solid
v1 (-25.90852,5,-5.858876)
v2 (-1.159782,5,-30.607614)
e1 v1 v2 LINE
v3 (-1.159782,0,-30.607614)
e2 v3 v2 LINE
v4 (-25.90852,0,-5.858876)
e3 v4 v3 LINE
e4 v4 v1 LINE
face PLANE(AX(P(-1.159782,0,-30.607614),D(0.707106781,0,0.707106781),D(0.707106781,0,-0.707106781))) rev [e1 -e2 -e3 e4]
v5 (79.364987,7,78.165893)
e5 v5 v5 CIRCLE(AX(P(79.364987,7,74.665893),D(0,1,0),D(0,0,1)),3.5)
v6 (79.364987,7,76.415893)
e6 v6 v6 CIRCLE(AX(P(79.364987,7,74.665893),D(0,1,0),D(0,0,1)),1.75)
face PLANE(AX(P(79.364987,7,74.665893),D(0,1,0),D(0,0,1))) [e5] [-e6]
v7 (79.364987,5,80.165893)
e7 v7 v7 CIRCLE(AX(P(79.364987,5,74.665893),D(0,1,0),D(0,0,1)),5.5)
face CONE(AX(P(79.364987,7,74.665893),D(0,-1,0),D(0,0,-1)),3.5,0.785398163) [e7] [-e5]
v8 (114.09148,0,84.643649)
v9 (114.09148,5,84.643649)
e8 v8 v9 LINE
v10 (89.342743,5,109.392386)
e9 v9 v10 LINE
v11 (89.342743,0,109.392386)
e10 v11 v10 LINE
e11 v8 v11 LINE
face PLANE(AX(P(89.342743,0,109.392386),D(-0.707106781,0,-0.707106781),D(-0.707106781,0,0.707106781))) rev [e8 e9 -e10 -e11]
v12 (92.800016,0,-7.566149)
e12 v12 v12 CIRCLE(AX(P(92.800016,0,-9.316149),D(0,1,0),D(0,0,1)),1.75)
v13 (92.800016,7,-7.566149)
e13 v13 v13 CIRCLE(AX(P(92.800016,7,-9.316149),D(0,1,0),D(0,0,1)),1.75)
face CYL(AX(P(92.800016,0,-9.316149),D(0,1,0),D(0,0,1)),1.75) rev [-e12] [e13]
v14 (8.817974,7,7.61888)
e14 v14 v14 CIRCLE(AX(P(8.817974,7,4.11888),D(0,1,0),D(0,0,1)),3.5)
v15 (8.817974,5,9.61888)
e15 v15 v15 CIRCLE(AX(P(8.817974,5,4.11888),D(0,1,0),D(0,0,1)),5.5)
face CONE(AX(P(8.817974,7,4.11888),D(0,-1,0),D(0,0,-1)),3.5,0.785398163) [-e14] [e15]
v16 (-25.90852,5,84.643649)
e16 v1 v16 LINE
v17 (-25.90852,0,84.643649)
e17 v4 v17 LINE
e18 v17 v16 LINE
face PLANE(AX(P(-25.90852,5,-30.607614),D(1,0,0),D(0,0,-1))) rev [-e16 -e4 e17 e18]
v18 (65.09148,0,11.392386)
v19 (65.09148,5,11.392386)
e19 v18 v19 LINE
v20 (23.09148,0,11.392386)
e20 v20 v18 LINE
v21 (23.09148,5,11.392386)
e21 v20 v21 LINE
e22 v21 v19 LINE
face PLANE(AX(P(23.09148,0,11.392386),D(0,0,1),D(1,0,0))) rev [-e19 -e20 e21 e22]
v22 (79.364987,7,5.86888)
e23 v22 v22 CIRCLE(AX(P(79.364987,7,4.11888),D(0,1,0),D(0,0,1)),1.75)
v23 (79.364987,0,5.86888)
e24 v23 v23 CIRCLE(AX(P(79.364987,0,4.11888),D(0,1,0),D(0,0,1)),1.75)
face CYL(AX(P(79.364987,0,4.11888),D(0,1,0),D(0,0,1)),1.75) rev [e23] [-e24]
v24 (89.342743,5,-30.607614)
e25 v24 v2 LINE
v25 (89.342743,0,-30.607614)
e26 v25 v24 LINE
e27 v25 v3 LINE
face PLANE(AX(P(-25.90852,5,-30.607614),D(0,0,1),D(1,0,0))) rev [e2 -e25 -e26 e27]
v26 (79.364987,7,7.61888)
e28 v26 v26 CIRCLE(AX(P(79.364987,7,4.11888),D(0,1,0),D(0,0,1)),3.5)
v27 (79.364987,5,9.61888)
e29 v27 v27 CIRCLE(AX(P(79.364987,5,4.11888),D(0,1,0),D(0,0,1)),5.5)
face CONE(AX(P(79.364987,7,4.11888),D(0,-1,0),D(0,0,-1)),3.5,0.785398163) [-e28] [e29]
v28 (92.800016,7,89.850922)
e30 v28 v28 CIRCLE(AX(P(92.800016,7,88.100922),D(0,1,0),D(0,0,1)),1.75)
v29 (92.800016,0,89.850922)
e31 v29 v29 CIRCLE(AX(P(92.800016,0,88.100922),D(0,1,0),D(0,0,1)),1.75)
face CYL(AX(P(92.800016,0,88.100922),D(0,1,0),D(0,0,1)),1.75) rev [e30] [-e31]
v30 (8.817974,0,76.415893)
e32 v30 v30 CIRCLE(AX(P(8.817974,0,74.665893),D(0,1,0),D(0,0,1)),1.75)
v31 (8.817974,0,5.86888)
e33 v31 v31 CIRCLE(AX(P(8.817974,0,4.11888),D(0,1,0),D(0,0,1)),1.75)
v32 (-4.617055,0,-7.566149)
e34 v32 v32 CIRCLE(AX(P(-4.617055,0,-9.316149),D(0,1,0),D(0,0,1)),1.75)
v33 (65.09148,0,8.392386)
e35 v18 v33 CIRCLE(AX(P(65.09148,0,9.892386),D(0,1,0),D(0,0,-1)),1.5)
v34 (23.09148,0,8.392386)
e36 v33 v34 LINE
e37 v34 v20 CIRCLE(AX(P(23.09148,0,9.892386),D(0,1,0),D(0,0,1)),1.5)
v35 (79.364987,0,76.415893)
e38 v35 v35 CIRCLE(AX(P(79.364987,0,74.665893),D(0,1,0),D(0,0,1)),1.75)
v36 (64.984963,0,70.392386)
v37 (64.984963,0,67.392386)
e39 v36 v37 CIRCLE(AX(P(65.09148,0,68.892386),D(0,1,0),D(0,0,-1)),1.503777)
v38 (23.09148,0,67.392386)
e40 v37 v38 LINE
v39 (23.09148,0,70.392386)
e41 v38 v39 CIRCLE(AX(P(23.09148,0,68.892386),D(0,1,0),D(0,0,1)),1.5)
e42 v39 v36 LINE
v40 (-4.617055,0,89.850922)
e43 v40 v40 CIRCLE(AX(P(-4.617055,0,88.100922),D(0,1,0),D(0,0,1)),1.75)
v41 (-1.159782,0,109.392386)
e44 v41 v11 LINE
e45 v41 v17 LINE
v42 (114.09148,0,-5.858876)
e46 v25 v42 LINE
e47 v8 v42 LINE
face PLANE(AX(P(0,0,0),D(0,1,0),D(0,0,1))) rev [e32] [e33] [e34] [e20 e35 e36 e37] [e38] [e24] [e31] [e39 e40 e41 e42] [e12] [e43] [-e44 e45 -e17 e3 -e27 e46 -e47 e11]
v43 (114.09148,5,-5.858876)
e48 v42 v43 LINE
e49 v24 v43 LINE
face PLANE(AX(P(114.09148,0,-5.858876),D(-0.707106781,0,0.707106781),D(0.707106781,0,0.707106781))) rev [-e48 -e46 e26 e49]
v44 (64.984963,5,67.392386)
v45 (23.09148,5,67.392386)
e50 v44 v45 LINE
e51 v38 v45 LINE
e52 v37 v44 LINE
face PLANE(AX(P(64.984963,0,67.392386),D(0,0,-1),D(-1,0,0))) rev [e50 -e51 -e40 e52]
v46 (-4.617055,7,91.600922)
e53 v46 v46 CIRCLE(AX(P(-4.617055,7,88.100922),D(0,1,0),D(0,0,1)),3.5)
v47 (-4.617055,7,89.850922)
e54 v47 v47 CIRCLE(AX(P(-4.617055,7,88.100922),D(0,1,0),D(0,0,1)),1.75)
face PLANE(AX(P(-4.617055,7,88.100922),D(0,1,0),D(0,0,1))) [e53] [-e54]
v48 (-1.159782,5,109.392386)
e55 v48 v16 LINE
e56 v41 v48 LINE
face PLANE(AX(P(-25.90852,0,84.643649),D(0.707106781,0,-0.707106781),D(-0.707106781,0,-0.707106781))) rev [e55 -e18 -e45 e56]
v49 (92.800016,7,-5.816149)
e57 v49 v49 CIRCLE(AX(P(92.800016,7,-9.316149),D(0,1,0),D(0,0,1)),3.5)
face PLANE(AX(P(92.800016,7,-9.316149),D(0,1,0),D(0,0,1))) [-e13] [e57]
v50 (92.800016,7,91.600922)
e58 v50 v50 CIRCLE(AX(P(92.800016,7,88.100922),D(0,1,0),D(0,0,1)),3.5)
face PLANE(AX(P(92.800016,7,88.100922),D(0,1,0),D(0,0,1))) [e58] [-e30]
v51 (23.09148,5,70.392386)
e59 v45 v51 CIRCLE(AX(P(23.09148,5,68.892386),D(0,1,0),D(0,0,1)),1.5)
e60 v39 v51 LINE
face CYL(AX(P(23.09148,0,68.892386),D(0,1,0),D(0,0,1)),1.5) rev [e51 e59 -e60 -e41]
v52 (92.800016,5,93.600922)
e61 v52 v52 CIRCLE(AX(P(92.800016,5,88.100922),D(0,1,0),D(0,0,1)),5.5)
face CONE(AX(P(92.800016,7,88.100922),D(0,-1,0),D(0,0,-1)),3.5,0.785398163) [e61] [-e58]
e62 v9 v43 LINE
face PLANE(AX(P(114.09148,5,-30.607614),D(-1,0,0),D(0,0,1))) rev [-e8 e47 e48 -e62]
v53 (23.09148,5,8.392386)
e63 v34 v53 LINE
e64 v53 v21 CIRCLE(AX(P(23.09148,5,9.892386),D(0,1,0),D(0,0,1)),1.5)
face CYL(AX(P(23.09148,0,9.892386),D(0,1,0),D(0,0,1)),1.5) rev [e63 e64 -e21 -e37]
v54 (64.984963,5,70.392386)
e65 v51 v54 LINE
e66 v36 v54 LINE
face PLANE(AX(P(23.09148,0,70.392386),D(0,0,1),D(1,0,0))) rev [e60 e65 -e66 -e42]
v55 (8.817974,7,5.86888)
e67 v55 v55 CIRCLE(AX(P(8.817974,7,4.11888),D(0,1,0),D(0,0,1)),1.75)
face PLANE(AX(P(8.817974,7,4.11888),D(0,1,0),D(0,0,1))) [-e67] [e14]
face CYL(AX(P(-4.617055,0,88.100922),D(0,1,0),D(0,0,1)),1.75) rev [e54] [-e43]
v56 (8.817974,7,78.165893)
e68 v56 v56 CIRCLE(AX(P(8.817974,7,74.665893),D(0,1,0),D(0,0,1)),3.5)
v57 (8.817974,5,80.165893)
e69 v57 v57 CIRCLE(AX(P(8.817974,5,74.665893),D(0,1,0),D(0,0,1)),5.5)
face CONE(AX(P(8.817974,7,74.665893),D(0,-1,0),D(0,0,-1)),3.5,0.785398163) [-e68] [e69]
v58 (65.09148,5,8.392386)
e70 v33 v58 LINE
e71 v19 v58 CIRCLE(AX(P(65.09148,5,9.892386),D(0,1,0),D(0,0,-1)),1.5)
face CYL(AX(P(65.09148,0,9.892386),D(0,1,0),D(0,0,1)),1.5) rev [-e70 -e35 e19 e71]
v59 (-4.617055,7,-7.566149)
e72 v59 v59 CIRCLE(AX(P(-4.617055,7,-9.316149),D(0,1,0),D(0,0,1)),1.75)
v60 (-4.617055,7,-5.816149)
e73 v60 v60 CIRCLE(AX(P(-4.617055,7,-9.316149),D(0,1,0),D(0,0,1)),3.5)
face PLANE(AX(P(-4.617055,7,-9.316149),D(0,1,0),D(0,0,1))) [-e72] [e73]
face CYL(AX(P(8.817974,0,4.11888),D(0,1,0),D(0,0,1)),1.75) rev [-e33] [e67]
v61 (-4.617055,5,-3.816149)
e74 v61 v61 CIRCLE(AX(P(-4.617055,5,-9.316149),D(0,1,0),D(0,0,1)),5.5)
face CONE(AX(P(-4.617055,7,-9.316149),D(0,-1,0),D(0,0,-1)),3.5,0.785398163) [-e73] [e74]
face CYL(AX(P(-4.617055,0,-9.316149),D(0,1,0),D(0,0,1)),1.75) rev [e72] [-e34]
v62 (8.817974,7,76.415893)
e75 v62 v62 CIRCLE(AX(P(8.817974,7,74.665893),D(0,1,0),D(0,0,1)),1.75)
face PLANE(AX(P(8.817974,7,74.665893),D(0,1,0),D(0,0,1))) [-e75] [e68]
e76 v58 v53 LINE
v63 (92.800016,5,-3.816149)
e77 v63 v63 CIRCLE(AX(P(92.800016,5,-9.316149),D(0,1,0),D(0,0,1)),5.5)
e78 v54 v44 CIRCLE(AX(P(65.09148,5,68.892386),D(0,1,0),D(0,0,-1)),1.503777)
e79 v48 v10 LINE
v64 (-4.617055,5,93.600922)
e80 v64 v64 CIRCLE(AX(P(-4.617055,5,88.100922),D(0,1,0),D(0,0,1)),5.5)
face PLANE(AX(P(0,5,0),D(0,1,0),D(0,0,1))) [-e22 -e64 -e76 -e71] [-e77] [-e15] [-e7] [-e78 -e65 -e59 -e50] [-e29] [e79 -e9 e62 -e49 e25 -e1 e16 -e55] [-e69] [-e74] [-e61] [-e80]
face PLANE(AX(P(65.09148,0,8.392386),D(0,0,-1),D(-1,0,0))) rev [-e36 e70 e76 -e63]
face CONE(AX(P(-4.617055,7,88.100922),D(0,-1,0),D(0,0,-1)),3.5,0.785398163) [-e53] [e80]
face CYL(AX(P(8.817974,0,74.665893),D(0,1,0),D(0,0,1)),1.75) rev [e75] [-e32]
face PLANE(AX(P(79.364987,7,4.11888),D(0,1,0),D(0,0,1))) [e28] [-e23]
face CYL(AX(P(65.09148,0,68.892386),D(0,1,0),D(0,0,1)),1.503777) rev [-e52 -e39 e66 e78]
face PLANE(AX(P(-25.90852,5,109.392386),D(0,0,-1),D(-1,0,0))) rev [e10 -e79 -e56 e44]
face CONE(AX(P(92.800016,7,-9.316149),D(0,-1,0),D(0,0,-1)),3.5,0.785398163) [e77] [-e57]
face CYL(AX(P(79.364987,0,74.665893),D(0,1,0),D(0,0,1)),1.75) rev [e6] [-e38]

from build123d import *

# Parameters (mm, degrees)
SCHIZZO1_W                   = 140
SCHIZZO1_H                   = 140
ESTRUSIONE_ESTRUSIONE1_DEPTH = 5
TAGLIO_ESTRUSIONE1_DEPTH     = 159.140950013
TAGLIO_ESTRUSIONE2_DEPTH     = 159.140950013
SCHIZZO4_R                   = 5.5
ESTRUSIONE_ESTRUSIONE2_DEPTH = 2
SMUSSO1_SIZE                 = 2
SCHIZZO5_R                   = 1.75
TAGLIO_ESTRUSIONE3_DEPTH     = 159.21681349


with BuildPart() as part:
    # Schizzo1 → Estrusione-Estrusione1 (new body)
    with BuildSketch(Plane(origin=(0, 0, 0), x_dir=(1, 0, 0), z_dir=(0, 1, 0))):
        with Locations((44.091480444, -39.392386211)):
            Rectangle(SCHIZZO1_W, SCHIZZO1_H)
    extrude(amount=ESTRUSIONE_ESTRUSIONE1_DEPTH)

    # Schizzo2 → Taglio-Estrusione1 (cut, through all)
    with BuildSketch(Plane(origin=(0, 5, 0), x_dir=(1, 0, 0), z_dir=(0, 1, 0))):
        Polygon((-1.159782214, 30.607613789), (-25.908519556, 5.858876448), (-25.908519556, 30.607613789), align=None)
        Polygon((114.091480444, 5.858876448), (89.342743103, 30.607613789), (114.091480444, 30.607613789), align=None)
        Polygon((89.342743103, -109.392386211), (114.091480444, -84.643648869), (114.091480444, -109.392386211), align=None)
        Polygon((-25.908519556, -84.643648869), (-1.159782214, -109.392386211), (-25.908519556, -109.392386211), align=None)
    extrude(amount=-TAGLIO_ESTRUSIONE1_DEPTH, mode=Mode.SUBTRACT)

    # Schizzo3 → Taglio-Estrusione2 (cut, through all)
    with BuildSketch(Plane(origin=(0, 5, 0), x_dir=(1, 0, 0), z_dir=(0, 1, 0))):
        with BuildLine():
            Line((64.984963173, -67.392386211), (23.091480444, -67.392386211))
            ThreePointArc((23.091480444, -67.392386211), (21.591480444, -68.892386211), (23.091480444, -70.392386211))
            Line((23.091480444, -70.392386211), (64.984963173, -70.392386211))
            ThreePointArc((64.984963173, -70.392386211), (66.595257665, -68.892386211), (64.984963173, -67.392386211))
        make_face()
        with BuildLine():
            Line((65.091480444, -8.392386211), (23.091480444, -8.392386211))
            ThreePointArc((23.091480444, -8.392386211), (21.591480444, -9.892386211), (23.091480444, -11.392386211))
            Line((23.091480444, -11.392386211), (65.091480444, -11.392386211))
            ThreePointArc((65.091480444, -11.392386211), (66.591480444, -9.892386211), (65.091480444, -8.392386211))
        make_face()
    extrude(amount=-TAGLIO_ESTRUSIONE2_DEPTH, mode=Mode.SUBTRACT)

    # Schizzo4 → Estrusione-Estrusione2 (add)
    with BuildSketch(Plane(origin=(0, 5, 0), x_dir=(1, 0, 0), z_dir=(0, 1, 0))):
        with Locations(Location((-4.617054872, -88.100921527, 0), (0, 0, 270))):
            Circle(SCHIZZO4_R)
        with Locations(Location((8.817973971, -74.665892685, 0), (0, 0, 270))):
            Circle(SCHIZZO4_R)
        with Locations(Location((-4.617054872, 9.316149105, 0), (0, 0, 270))):
            Circle(SCHIZZO4_R)
        with Locations(Location((8.817973971, -4.118879737, 0), (0, 0, 270))):
            Circle(SCHIZZO4_R)
        with Locations(Location((92.80001576, 9.316149105, 0), (0, 0, 270))):
            Circle(SCHIZZO4_R)
        with Locations(Location((79.364986918, -4.118879737, 0), (0, 0, 270))):
            Circle(SCHIZZO4_R)
        with Locations(Location((92.80001576, -88.100921527, 0), (0, 0, 270))):
            Circle(SCHIZZO4_R)
        with Locations(Location((79.364986918, -74.665892685, 0), (0, 0, 270))):
            Circle(SCHIZZO4_R)
    extrude(amount=ESTRUSIONE_ESTRUSIONE2_DEPTH)

    # Smusso1
    smusso1_edges = [part.edges().sort_by_distance(p)[0] for p in [
        (92.80001576, 7, -14.816149105),
        (79.364986918, 7, -1.381120263),
        (92.80001576, 7, 82.600921527),
        (79.364986918, 7, 69.165892685),
        (-4.617054872, 7, 82.600921527),
        (8.817973971, 7, 69.165892685),
        (-4.617054872, 7, -14.816149105),
        (8.817973971, 7, -1.381120263),
    ]]
    chamfer(smusso1_edges, length=SMUSSO1_SIZE - 0.0001)  # a hair under: the kernel refuses the full size

    # Schizzo5 → Taglio-Estrusione3 (cut, through all)
    with BuildSketch(Plane(origin=(0, 7, 0), x_dir=(1, 0, 0), z_dir=(0, 1, 0))):
        with Locations(Location((-4.617054872, -88.100921527, 0), (0, 0, 270))):
            Circle(SCHIZZO5_R)
        with Locations(Location((8.817973971, -74.665892685, 0), (0, 0, 270))):
            Circle(SCHIZZO5_R)
        with Locations(Location((-4.617054872, 9.316149105, 0), (0, 0, 270))):
            Circle(SCHIZZO5_R)
        with Locations(Location((8.817973971, -4.118879737, 0), (0, 0, 270))):
            Circle(SCHIZZO5_R)
        with Locations(Location((92.80001576, 9.316149105, 0), (0, 0, 270))):
            Circle(SCHIZZO5_R)
        with Locations(Location((79.364986918, -4.118879737, 0), (0, 0, 270))):
            Circle(SCHIZZO5_R)
        with Locations(Location((92.80001576, -88.100921527, 0), (0, 0, 270))):
            Circle(SCHIZZO5_R)
        with Locations(Location((79.364986918, -74.665892685, 0), (0, 0, 270))):
            Circle(SCHIZZO5_R)
    extrude(amount=-TAGLIO_ESTRUSIONE3_DEPTH, mode=Mode.SUBTRACT)


solid = part.part
